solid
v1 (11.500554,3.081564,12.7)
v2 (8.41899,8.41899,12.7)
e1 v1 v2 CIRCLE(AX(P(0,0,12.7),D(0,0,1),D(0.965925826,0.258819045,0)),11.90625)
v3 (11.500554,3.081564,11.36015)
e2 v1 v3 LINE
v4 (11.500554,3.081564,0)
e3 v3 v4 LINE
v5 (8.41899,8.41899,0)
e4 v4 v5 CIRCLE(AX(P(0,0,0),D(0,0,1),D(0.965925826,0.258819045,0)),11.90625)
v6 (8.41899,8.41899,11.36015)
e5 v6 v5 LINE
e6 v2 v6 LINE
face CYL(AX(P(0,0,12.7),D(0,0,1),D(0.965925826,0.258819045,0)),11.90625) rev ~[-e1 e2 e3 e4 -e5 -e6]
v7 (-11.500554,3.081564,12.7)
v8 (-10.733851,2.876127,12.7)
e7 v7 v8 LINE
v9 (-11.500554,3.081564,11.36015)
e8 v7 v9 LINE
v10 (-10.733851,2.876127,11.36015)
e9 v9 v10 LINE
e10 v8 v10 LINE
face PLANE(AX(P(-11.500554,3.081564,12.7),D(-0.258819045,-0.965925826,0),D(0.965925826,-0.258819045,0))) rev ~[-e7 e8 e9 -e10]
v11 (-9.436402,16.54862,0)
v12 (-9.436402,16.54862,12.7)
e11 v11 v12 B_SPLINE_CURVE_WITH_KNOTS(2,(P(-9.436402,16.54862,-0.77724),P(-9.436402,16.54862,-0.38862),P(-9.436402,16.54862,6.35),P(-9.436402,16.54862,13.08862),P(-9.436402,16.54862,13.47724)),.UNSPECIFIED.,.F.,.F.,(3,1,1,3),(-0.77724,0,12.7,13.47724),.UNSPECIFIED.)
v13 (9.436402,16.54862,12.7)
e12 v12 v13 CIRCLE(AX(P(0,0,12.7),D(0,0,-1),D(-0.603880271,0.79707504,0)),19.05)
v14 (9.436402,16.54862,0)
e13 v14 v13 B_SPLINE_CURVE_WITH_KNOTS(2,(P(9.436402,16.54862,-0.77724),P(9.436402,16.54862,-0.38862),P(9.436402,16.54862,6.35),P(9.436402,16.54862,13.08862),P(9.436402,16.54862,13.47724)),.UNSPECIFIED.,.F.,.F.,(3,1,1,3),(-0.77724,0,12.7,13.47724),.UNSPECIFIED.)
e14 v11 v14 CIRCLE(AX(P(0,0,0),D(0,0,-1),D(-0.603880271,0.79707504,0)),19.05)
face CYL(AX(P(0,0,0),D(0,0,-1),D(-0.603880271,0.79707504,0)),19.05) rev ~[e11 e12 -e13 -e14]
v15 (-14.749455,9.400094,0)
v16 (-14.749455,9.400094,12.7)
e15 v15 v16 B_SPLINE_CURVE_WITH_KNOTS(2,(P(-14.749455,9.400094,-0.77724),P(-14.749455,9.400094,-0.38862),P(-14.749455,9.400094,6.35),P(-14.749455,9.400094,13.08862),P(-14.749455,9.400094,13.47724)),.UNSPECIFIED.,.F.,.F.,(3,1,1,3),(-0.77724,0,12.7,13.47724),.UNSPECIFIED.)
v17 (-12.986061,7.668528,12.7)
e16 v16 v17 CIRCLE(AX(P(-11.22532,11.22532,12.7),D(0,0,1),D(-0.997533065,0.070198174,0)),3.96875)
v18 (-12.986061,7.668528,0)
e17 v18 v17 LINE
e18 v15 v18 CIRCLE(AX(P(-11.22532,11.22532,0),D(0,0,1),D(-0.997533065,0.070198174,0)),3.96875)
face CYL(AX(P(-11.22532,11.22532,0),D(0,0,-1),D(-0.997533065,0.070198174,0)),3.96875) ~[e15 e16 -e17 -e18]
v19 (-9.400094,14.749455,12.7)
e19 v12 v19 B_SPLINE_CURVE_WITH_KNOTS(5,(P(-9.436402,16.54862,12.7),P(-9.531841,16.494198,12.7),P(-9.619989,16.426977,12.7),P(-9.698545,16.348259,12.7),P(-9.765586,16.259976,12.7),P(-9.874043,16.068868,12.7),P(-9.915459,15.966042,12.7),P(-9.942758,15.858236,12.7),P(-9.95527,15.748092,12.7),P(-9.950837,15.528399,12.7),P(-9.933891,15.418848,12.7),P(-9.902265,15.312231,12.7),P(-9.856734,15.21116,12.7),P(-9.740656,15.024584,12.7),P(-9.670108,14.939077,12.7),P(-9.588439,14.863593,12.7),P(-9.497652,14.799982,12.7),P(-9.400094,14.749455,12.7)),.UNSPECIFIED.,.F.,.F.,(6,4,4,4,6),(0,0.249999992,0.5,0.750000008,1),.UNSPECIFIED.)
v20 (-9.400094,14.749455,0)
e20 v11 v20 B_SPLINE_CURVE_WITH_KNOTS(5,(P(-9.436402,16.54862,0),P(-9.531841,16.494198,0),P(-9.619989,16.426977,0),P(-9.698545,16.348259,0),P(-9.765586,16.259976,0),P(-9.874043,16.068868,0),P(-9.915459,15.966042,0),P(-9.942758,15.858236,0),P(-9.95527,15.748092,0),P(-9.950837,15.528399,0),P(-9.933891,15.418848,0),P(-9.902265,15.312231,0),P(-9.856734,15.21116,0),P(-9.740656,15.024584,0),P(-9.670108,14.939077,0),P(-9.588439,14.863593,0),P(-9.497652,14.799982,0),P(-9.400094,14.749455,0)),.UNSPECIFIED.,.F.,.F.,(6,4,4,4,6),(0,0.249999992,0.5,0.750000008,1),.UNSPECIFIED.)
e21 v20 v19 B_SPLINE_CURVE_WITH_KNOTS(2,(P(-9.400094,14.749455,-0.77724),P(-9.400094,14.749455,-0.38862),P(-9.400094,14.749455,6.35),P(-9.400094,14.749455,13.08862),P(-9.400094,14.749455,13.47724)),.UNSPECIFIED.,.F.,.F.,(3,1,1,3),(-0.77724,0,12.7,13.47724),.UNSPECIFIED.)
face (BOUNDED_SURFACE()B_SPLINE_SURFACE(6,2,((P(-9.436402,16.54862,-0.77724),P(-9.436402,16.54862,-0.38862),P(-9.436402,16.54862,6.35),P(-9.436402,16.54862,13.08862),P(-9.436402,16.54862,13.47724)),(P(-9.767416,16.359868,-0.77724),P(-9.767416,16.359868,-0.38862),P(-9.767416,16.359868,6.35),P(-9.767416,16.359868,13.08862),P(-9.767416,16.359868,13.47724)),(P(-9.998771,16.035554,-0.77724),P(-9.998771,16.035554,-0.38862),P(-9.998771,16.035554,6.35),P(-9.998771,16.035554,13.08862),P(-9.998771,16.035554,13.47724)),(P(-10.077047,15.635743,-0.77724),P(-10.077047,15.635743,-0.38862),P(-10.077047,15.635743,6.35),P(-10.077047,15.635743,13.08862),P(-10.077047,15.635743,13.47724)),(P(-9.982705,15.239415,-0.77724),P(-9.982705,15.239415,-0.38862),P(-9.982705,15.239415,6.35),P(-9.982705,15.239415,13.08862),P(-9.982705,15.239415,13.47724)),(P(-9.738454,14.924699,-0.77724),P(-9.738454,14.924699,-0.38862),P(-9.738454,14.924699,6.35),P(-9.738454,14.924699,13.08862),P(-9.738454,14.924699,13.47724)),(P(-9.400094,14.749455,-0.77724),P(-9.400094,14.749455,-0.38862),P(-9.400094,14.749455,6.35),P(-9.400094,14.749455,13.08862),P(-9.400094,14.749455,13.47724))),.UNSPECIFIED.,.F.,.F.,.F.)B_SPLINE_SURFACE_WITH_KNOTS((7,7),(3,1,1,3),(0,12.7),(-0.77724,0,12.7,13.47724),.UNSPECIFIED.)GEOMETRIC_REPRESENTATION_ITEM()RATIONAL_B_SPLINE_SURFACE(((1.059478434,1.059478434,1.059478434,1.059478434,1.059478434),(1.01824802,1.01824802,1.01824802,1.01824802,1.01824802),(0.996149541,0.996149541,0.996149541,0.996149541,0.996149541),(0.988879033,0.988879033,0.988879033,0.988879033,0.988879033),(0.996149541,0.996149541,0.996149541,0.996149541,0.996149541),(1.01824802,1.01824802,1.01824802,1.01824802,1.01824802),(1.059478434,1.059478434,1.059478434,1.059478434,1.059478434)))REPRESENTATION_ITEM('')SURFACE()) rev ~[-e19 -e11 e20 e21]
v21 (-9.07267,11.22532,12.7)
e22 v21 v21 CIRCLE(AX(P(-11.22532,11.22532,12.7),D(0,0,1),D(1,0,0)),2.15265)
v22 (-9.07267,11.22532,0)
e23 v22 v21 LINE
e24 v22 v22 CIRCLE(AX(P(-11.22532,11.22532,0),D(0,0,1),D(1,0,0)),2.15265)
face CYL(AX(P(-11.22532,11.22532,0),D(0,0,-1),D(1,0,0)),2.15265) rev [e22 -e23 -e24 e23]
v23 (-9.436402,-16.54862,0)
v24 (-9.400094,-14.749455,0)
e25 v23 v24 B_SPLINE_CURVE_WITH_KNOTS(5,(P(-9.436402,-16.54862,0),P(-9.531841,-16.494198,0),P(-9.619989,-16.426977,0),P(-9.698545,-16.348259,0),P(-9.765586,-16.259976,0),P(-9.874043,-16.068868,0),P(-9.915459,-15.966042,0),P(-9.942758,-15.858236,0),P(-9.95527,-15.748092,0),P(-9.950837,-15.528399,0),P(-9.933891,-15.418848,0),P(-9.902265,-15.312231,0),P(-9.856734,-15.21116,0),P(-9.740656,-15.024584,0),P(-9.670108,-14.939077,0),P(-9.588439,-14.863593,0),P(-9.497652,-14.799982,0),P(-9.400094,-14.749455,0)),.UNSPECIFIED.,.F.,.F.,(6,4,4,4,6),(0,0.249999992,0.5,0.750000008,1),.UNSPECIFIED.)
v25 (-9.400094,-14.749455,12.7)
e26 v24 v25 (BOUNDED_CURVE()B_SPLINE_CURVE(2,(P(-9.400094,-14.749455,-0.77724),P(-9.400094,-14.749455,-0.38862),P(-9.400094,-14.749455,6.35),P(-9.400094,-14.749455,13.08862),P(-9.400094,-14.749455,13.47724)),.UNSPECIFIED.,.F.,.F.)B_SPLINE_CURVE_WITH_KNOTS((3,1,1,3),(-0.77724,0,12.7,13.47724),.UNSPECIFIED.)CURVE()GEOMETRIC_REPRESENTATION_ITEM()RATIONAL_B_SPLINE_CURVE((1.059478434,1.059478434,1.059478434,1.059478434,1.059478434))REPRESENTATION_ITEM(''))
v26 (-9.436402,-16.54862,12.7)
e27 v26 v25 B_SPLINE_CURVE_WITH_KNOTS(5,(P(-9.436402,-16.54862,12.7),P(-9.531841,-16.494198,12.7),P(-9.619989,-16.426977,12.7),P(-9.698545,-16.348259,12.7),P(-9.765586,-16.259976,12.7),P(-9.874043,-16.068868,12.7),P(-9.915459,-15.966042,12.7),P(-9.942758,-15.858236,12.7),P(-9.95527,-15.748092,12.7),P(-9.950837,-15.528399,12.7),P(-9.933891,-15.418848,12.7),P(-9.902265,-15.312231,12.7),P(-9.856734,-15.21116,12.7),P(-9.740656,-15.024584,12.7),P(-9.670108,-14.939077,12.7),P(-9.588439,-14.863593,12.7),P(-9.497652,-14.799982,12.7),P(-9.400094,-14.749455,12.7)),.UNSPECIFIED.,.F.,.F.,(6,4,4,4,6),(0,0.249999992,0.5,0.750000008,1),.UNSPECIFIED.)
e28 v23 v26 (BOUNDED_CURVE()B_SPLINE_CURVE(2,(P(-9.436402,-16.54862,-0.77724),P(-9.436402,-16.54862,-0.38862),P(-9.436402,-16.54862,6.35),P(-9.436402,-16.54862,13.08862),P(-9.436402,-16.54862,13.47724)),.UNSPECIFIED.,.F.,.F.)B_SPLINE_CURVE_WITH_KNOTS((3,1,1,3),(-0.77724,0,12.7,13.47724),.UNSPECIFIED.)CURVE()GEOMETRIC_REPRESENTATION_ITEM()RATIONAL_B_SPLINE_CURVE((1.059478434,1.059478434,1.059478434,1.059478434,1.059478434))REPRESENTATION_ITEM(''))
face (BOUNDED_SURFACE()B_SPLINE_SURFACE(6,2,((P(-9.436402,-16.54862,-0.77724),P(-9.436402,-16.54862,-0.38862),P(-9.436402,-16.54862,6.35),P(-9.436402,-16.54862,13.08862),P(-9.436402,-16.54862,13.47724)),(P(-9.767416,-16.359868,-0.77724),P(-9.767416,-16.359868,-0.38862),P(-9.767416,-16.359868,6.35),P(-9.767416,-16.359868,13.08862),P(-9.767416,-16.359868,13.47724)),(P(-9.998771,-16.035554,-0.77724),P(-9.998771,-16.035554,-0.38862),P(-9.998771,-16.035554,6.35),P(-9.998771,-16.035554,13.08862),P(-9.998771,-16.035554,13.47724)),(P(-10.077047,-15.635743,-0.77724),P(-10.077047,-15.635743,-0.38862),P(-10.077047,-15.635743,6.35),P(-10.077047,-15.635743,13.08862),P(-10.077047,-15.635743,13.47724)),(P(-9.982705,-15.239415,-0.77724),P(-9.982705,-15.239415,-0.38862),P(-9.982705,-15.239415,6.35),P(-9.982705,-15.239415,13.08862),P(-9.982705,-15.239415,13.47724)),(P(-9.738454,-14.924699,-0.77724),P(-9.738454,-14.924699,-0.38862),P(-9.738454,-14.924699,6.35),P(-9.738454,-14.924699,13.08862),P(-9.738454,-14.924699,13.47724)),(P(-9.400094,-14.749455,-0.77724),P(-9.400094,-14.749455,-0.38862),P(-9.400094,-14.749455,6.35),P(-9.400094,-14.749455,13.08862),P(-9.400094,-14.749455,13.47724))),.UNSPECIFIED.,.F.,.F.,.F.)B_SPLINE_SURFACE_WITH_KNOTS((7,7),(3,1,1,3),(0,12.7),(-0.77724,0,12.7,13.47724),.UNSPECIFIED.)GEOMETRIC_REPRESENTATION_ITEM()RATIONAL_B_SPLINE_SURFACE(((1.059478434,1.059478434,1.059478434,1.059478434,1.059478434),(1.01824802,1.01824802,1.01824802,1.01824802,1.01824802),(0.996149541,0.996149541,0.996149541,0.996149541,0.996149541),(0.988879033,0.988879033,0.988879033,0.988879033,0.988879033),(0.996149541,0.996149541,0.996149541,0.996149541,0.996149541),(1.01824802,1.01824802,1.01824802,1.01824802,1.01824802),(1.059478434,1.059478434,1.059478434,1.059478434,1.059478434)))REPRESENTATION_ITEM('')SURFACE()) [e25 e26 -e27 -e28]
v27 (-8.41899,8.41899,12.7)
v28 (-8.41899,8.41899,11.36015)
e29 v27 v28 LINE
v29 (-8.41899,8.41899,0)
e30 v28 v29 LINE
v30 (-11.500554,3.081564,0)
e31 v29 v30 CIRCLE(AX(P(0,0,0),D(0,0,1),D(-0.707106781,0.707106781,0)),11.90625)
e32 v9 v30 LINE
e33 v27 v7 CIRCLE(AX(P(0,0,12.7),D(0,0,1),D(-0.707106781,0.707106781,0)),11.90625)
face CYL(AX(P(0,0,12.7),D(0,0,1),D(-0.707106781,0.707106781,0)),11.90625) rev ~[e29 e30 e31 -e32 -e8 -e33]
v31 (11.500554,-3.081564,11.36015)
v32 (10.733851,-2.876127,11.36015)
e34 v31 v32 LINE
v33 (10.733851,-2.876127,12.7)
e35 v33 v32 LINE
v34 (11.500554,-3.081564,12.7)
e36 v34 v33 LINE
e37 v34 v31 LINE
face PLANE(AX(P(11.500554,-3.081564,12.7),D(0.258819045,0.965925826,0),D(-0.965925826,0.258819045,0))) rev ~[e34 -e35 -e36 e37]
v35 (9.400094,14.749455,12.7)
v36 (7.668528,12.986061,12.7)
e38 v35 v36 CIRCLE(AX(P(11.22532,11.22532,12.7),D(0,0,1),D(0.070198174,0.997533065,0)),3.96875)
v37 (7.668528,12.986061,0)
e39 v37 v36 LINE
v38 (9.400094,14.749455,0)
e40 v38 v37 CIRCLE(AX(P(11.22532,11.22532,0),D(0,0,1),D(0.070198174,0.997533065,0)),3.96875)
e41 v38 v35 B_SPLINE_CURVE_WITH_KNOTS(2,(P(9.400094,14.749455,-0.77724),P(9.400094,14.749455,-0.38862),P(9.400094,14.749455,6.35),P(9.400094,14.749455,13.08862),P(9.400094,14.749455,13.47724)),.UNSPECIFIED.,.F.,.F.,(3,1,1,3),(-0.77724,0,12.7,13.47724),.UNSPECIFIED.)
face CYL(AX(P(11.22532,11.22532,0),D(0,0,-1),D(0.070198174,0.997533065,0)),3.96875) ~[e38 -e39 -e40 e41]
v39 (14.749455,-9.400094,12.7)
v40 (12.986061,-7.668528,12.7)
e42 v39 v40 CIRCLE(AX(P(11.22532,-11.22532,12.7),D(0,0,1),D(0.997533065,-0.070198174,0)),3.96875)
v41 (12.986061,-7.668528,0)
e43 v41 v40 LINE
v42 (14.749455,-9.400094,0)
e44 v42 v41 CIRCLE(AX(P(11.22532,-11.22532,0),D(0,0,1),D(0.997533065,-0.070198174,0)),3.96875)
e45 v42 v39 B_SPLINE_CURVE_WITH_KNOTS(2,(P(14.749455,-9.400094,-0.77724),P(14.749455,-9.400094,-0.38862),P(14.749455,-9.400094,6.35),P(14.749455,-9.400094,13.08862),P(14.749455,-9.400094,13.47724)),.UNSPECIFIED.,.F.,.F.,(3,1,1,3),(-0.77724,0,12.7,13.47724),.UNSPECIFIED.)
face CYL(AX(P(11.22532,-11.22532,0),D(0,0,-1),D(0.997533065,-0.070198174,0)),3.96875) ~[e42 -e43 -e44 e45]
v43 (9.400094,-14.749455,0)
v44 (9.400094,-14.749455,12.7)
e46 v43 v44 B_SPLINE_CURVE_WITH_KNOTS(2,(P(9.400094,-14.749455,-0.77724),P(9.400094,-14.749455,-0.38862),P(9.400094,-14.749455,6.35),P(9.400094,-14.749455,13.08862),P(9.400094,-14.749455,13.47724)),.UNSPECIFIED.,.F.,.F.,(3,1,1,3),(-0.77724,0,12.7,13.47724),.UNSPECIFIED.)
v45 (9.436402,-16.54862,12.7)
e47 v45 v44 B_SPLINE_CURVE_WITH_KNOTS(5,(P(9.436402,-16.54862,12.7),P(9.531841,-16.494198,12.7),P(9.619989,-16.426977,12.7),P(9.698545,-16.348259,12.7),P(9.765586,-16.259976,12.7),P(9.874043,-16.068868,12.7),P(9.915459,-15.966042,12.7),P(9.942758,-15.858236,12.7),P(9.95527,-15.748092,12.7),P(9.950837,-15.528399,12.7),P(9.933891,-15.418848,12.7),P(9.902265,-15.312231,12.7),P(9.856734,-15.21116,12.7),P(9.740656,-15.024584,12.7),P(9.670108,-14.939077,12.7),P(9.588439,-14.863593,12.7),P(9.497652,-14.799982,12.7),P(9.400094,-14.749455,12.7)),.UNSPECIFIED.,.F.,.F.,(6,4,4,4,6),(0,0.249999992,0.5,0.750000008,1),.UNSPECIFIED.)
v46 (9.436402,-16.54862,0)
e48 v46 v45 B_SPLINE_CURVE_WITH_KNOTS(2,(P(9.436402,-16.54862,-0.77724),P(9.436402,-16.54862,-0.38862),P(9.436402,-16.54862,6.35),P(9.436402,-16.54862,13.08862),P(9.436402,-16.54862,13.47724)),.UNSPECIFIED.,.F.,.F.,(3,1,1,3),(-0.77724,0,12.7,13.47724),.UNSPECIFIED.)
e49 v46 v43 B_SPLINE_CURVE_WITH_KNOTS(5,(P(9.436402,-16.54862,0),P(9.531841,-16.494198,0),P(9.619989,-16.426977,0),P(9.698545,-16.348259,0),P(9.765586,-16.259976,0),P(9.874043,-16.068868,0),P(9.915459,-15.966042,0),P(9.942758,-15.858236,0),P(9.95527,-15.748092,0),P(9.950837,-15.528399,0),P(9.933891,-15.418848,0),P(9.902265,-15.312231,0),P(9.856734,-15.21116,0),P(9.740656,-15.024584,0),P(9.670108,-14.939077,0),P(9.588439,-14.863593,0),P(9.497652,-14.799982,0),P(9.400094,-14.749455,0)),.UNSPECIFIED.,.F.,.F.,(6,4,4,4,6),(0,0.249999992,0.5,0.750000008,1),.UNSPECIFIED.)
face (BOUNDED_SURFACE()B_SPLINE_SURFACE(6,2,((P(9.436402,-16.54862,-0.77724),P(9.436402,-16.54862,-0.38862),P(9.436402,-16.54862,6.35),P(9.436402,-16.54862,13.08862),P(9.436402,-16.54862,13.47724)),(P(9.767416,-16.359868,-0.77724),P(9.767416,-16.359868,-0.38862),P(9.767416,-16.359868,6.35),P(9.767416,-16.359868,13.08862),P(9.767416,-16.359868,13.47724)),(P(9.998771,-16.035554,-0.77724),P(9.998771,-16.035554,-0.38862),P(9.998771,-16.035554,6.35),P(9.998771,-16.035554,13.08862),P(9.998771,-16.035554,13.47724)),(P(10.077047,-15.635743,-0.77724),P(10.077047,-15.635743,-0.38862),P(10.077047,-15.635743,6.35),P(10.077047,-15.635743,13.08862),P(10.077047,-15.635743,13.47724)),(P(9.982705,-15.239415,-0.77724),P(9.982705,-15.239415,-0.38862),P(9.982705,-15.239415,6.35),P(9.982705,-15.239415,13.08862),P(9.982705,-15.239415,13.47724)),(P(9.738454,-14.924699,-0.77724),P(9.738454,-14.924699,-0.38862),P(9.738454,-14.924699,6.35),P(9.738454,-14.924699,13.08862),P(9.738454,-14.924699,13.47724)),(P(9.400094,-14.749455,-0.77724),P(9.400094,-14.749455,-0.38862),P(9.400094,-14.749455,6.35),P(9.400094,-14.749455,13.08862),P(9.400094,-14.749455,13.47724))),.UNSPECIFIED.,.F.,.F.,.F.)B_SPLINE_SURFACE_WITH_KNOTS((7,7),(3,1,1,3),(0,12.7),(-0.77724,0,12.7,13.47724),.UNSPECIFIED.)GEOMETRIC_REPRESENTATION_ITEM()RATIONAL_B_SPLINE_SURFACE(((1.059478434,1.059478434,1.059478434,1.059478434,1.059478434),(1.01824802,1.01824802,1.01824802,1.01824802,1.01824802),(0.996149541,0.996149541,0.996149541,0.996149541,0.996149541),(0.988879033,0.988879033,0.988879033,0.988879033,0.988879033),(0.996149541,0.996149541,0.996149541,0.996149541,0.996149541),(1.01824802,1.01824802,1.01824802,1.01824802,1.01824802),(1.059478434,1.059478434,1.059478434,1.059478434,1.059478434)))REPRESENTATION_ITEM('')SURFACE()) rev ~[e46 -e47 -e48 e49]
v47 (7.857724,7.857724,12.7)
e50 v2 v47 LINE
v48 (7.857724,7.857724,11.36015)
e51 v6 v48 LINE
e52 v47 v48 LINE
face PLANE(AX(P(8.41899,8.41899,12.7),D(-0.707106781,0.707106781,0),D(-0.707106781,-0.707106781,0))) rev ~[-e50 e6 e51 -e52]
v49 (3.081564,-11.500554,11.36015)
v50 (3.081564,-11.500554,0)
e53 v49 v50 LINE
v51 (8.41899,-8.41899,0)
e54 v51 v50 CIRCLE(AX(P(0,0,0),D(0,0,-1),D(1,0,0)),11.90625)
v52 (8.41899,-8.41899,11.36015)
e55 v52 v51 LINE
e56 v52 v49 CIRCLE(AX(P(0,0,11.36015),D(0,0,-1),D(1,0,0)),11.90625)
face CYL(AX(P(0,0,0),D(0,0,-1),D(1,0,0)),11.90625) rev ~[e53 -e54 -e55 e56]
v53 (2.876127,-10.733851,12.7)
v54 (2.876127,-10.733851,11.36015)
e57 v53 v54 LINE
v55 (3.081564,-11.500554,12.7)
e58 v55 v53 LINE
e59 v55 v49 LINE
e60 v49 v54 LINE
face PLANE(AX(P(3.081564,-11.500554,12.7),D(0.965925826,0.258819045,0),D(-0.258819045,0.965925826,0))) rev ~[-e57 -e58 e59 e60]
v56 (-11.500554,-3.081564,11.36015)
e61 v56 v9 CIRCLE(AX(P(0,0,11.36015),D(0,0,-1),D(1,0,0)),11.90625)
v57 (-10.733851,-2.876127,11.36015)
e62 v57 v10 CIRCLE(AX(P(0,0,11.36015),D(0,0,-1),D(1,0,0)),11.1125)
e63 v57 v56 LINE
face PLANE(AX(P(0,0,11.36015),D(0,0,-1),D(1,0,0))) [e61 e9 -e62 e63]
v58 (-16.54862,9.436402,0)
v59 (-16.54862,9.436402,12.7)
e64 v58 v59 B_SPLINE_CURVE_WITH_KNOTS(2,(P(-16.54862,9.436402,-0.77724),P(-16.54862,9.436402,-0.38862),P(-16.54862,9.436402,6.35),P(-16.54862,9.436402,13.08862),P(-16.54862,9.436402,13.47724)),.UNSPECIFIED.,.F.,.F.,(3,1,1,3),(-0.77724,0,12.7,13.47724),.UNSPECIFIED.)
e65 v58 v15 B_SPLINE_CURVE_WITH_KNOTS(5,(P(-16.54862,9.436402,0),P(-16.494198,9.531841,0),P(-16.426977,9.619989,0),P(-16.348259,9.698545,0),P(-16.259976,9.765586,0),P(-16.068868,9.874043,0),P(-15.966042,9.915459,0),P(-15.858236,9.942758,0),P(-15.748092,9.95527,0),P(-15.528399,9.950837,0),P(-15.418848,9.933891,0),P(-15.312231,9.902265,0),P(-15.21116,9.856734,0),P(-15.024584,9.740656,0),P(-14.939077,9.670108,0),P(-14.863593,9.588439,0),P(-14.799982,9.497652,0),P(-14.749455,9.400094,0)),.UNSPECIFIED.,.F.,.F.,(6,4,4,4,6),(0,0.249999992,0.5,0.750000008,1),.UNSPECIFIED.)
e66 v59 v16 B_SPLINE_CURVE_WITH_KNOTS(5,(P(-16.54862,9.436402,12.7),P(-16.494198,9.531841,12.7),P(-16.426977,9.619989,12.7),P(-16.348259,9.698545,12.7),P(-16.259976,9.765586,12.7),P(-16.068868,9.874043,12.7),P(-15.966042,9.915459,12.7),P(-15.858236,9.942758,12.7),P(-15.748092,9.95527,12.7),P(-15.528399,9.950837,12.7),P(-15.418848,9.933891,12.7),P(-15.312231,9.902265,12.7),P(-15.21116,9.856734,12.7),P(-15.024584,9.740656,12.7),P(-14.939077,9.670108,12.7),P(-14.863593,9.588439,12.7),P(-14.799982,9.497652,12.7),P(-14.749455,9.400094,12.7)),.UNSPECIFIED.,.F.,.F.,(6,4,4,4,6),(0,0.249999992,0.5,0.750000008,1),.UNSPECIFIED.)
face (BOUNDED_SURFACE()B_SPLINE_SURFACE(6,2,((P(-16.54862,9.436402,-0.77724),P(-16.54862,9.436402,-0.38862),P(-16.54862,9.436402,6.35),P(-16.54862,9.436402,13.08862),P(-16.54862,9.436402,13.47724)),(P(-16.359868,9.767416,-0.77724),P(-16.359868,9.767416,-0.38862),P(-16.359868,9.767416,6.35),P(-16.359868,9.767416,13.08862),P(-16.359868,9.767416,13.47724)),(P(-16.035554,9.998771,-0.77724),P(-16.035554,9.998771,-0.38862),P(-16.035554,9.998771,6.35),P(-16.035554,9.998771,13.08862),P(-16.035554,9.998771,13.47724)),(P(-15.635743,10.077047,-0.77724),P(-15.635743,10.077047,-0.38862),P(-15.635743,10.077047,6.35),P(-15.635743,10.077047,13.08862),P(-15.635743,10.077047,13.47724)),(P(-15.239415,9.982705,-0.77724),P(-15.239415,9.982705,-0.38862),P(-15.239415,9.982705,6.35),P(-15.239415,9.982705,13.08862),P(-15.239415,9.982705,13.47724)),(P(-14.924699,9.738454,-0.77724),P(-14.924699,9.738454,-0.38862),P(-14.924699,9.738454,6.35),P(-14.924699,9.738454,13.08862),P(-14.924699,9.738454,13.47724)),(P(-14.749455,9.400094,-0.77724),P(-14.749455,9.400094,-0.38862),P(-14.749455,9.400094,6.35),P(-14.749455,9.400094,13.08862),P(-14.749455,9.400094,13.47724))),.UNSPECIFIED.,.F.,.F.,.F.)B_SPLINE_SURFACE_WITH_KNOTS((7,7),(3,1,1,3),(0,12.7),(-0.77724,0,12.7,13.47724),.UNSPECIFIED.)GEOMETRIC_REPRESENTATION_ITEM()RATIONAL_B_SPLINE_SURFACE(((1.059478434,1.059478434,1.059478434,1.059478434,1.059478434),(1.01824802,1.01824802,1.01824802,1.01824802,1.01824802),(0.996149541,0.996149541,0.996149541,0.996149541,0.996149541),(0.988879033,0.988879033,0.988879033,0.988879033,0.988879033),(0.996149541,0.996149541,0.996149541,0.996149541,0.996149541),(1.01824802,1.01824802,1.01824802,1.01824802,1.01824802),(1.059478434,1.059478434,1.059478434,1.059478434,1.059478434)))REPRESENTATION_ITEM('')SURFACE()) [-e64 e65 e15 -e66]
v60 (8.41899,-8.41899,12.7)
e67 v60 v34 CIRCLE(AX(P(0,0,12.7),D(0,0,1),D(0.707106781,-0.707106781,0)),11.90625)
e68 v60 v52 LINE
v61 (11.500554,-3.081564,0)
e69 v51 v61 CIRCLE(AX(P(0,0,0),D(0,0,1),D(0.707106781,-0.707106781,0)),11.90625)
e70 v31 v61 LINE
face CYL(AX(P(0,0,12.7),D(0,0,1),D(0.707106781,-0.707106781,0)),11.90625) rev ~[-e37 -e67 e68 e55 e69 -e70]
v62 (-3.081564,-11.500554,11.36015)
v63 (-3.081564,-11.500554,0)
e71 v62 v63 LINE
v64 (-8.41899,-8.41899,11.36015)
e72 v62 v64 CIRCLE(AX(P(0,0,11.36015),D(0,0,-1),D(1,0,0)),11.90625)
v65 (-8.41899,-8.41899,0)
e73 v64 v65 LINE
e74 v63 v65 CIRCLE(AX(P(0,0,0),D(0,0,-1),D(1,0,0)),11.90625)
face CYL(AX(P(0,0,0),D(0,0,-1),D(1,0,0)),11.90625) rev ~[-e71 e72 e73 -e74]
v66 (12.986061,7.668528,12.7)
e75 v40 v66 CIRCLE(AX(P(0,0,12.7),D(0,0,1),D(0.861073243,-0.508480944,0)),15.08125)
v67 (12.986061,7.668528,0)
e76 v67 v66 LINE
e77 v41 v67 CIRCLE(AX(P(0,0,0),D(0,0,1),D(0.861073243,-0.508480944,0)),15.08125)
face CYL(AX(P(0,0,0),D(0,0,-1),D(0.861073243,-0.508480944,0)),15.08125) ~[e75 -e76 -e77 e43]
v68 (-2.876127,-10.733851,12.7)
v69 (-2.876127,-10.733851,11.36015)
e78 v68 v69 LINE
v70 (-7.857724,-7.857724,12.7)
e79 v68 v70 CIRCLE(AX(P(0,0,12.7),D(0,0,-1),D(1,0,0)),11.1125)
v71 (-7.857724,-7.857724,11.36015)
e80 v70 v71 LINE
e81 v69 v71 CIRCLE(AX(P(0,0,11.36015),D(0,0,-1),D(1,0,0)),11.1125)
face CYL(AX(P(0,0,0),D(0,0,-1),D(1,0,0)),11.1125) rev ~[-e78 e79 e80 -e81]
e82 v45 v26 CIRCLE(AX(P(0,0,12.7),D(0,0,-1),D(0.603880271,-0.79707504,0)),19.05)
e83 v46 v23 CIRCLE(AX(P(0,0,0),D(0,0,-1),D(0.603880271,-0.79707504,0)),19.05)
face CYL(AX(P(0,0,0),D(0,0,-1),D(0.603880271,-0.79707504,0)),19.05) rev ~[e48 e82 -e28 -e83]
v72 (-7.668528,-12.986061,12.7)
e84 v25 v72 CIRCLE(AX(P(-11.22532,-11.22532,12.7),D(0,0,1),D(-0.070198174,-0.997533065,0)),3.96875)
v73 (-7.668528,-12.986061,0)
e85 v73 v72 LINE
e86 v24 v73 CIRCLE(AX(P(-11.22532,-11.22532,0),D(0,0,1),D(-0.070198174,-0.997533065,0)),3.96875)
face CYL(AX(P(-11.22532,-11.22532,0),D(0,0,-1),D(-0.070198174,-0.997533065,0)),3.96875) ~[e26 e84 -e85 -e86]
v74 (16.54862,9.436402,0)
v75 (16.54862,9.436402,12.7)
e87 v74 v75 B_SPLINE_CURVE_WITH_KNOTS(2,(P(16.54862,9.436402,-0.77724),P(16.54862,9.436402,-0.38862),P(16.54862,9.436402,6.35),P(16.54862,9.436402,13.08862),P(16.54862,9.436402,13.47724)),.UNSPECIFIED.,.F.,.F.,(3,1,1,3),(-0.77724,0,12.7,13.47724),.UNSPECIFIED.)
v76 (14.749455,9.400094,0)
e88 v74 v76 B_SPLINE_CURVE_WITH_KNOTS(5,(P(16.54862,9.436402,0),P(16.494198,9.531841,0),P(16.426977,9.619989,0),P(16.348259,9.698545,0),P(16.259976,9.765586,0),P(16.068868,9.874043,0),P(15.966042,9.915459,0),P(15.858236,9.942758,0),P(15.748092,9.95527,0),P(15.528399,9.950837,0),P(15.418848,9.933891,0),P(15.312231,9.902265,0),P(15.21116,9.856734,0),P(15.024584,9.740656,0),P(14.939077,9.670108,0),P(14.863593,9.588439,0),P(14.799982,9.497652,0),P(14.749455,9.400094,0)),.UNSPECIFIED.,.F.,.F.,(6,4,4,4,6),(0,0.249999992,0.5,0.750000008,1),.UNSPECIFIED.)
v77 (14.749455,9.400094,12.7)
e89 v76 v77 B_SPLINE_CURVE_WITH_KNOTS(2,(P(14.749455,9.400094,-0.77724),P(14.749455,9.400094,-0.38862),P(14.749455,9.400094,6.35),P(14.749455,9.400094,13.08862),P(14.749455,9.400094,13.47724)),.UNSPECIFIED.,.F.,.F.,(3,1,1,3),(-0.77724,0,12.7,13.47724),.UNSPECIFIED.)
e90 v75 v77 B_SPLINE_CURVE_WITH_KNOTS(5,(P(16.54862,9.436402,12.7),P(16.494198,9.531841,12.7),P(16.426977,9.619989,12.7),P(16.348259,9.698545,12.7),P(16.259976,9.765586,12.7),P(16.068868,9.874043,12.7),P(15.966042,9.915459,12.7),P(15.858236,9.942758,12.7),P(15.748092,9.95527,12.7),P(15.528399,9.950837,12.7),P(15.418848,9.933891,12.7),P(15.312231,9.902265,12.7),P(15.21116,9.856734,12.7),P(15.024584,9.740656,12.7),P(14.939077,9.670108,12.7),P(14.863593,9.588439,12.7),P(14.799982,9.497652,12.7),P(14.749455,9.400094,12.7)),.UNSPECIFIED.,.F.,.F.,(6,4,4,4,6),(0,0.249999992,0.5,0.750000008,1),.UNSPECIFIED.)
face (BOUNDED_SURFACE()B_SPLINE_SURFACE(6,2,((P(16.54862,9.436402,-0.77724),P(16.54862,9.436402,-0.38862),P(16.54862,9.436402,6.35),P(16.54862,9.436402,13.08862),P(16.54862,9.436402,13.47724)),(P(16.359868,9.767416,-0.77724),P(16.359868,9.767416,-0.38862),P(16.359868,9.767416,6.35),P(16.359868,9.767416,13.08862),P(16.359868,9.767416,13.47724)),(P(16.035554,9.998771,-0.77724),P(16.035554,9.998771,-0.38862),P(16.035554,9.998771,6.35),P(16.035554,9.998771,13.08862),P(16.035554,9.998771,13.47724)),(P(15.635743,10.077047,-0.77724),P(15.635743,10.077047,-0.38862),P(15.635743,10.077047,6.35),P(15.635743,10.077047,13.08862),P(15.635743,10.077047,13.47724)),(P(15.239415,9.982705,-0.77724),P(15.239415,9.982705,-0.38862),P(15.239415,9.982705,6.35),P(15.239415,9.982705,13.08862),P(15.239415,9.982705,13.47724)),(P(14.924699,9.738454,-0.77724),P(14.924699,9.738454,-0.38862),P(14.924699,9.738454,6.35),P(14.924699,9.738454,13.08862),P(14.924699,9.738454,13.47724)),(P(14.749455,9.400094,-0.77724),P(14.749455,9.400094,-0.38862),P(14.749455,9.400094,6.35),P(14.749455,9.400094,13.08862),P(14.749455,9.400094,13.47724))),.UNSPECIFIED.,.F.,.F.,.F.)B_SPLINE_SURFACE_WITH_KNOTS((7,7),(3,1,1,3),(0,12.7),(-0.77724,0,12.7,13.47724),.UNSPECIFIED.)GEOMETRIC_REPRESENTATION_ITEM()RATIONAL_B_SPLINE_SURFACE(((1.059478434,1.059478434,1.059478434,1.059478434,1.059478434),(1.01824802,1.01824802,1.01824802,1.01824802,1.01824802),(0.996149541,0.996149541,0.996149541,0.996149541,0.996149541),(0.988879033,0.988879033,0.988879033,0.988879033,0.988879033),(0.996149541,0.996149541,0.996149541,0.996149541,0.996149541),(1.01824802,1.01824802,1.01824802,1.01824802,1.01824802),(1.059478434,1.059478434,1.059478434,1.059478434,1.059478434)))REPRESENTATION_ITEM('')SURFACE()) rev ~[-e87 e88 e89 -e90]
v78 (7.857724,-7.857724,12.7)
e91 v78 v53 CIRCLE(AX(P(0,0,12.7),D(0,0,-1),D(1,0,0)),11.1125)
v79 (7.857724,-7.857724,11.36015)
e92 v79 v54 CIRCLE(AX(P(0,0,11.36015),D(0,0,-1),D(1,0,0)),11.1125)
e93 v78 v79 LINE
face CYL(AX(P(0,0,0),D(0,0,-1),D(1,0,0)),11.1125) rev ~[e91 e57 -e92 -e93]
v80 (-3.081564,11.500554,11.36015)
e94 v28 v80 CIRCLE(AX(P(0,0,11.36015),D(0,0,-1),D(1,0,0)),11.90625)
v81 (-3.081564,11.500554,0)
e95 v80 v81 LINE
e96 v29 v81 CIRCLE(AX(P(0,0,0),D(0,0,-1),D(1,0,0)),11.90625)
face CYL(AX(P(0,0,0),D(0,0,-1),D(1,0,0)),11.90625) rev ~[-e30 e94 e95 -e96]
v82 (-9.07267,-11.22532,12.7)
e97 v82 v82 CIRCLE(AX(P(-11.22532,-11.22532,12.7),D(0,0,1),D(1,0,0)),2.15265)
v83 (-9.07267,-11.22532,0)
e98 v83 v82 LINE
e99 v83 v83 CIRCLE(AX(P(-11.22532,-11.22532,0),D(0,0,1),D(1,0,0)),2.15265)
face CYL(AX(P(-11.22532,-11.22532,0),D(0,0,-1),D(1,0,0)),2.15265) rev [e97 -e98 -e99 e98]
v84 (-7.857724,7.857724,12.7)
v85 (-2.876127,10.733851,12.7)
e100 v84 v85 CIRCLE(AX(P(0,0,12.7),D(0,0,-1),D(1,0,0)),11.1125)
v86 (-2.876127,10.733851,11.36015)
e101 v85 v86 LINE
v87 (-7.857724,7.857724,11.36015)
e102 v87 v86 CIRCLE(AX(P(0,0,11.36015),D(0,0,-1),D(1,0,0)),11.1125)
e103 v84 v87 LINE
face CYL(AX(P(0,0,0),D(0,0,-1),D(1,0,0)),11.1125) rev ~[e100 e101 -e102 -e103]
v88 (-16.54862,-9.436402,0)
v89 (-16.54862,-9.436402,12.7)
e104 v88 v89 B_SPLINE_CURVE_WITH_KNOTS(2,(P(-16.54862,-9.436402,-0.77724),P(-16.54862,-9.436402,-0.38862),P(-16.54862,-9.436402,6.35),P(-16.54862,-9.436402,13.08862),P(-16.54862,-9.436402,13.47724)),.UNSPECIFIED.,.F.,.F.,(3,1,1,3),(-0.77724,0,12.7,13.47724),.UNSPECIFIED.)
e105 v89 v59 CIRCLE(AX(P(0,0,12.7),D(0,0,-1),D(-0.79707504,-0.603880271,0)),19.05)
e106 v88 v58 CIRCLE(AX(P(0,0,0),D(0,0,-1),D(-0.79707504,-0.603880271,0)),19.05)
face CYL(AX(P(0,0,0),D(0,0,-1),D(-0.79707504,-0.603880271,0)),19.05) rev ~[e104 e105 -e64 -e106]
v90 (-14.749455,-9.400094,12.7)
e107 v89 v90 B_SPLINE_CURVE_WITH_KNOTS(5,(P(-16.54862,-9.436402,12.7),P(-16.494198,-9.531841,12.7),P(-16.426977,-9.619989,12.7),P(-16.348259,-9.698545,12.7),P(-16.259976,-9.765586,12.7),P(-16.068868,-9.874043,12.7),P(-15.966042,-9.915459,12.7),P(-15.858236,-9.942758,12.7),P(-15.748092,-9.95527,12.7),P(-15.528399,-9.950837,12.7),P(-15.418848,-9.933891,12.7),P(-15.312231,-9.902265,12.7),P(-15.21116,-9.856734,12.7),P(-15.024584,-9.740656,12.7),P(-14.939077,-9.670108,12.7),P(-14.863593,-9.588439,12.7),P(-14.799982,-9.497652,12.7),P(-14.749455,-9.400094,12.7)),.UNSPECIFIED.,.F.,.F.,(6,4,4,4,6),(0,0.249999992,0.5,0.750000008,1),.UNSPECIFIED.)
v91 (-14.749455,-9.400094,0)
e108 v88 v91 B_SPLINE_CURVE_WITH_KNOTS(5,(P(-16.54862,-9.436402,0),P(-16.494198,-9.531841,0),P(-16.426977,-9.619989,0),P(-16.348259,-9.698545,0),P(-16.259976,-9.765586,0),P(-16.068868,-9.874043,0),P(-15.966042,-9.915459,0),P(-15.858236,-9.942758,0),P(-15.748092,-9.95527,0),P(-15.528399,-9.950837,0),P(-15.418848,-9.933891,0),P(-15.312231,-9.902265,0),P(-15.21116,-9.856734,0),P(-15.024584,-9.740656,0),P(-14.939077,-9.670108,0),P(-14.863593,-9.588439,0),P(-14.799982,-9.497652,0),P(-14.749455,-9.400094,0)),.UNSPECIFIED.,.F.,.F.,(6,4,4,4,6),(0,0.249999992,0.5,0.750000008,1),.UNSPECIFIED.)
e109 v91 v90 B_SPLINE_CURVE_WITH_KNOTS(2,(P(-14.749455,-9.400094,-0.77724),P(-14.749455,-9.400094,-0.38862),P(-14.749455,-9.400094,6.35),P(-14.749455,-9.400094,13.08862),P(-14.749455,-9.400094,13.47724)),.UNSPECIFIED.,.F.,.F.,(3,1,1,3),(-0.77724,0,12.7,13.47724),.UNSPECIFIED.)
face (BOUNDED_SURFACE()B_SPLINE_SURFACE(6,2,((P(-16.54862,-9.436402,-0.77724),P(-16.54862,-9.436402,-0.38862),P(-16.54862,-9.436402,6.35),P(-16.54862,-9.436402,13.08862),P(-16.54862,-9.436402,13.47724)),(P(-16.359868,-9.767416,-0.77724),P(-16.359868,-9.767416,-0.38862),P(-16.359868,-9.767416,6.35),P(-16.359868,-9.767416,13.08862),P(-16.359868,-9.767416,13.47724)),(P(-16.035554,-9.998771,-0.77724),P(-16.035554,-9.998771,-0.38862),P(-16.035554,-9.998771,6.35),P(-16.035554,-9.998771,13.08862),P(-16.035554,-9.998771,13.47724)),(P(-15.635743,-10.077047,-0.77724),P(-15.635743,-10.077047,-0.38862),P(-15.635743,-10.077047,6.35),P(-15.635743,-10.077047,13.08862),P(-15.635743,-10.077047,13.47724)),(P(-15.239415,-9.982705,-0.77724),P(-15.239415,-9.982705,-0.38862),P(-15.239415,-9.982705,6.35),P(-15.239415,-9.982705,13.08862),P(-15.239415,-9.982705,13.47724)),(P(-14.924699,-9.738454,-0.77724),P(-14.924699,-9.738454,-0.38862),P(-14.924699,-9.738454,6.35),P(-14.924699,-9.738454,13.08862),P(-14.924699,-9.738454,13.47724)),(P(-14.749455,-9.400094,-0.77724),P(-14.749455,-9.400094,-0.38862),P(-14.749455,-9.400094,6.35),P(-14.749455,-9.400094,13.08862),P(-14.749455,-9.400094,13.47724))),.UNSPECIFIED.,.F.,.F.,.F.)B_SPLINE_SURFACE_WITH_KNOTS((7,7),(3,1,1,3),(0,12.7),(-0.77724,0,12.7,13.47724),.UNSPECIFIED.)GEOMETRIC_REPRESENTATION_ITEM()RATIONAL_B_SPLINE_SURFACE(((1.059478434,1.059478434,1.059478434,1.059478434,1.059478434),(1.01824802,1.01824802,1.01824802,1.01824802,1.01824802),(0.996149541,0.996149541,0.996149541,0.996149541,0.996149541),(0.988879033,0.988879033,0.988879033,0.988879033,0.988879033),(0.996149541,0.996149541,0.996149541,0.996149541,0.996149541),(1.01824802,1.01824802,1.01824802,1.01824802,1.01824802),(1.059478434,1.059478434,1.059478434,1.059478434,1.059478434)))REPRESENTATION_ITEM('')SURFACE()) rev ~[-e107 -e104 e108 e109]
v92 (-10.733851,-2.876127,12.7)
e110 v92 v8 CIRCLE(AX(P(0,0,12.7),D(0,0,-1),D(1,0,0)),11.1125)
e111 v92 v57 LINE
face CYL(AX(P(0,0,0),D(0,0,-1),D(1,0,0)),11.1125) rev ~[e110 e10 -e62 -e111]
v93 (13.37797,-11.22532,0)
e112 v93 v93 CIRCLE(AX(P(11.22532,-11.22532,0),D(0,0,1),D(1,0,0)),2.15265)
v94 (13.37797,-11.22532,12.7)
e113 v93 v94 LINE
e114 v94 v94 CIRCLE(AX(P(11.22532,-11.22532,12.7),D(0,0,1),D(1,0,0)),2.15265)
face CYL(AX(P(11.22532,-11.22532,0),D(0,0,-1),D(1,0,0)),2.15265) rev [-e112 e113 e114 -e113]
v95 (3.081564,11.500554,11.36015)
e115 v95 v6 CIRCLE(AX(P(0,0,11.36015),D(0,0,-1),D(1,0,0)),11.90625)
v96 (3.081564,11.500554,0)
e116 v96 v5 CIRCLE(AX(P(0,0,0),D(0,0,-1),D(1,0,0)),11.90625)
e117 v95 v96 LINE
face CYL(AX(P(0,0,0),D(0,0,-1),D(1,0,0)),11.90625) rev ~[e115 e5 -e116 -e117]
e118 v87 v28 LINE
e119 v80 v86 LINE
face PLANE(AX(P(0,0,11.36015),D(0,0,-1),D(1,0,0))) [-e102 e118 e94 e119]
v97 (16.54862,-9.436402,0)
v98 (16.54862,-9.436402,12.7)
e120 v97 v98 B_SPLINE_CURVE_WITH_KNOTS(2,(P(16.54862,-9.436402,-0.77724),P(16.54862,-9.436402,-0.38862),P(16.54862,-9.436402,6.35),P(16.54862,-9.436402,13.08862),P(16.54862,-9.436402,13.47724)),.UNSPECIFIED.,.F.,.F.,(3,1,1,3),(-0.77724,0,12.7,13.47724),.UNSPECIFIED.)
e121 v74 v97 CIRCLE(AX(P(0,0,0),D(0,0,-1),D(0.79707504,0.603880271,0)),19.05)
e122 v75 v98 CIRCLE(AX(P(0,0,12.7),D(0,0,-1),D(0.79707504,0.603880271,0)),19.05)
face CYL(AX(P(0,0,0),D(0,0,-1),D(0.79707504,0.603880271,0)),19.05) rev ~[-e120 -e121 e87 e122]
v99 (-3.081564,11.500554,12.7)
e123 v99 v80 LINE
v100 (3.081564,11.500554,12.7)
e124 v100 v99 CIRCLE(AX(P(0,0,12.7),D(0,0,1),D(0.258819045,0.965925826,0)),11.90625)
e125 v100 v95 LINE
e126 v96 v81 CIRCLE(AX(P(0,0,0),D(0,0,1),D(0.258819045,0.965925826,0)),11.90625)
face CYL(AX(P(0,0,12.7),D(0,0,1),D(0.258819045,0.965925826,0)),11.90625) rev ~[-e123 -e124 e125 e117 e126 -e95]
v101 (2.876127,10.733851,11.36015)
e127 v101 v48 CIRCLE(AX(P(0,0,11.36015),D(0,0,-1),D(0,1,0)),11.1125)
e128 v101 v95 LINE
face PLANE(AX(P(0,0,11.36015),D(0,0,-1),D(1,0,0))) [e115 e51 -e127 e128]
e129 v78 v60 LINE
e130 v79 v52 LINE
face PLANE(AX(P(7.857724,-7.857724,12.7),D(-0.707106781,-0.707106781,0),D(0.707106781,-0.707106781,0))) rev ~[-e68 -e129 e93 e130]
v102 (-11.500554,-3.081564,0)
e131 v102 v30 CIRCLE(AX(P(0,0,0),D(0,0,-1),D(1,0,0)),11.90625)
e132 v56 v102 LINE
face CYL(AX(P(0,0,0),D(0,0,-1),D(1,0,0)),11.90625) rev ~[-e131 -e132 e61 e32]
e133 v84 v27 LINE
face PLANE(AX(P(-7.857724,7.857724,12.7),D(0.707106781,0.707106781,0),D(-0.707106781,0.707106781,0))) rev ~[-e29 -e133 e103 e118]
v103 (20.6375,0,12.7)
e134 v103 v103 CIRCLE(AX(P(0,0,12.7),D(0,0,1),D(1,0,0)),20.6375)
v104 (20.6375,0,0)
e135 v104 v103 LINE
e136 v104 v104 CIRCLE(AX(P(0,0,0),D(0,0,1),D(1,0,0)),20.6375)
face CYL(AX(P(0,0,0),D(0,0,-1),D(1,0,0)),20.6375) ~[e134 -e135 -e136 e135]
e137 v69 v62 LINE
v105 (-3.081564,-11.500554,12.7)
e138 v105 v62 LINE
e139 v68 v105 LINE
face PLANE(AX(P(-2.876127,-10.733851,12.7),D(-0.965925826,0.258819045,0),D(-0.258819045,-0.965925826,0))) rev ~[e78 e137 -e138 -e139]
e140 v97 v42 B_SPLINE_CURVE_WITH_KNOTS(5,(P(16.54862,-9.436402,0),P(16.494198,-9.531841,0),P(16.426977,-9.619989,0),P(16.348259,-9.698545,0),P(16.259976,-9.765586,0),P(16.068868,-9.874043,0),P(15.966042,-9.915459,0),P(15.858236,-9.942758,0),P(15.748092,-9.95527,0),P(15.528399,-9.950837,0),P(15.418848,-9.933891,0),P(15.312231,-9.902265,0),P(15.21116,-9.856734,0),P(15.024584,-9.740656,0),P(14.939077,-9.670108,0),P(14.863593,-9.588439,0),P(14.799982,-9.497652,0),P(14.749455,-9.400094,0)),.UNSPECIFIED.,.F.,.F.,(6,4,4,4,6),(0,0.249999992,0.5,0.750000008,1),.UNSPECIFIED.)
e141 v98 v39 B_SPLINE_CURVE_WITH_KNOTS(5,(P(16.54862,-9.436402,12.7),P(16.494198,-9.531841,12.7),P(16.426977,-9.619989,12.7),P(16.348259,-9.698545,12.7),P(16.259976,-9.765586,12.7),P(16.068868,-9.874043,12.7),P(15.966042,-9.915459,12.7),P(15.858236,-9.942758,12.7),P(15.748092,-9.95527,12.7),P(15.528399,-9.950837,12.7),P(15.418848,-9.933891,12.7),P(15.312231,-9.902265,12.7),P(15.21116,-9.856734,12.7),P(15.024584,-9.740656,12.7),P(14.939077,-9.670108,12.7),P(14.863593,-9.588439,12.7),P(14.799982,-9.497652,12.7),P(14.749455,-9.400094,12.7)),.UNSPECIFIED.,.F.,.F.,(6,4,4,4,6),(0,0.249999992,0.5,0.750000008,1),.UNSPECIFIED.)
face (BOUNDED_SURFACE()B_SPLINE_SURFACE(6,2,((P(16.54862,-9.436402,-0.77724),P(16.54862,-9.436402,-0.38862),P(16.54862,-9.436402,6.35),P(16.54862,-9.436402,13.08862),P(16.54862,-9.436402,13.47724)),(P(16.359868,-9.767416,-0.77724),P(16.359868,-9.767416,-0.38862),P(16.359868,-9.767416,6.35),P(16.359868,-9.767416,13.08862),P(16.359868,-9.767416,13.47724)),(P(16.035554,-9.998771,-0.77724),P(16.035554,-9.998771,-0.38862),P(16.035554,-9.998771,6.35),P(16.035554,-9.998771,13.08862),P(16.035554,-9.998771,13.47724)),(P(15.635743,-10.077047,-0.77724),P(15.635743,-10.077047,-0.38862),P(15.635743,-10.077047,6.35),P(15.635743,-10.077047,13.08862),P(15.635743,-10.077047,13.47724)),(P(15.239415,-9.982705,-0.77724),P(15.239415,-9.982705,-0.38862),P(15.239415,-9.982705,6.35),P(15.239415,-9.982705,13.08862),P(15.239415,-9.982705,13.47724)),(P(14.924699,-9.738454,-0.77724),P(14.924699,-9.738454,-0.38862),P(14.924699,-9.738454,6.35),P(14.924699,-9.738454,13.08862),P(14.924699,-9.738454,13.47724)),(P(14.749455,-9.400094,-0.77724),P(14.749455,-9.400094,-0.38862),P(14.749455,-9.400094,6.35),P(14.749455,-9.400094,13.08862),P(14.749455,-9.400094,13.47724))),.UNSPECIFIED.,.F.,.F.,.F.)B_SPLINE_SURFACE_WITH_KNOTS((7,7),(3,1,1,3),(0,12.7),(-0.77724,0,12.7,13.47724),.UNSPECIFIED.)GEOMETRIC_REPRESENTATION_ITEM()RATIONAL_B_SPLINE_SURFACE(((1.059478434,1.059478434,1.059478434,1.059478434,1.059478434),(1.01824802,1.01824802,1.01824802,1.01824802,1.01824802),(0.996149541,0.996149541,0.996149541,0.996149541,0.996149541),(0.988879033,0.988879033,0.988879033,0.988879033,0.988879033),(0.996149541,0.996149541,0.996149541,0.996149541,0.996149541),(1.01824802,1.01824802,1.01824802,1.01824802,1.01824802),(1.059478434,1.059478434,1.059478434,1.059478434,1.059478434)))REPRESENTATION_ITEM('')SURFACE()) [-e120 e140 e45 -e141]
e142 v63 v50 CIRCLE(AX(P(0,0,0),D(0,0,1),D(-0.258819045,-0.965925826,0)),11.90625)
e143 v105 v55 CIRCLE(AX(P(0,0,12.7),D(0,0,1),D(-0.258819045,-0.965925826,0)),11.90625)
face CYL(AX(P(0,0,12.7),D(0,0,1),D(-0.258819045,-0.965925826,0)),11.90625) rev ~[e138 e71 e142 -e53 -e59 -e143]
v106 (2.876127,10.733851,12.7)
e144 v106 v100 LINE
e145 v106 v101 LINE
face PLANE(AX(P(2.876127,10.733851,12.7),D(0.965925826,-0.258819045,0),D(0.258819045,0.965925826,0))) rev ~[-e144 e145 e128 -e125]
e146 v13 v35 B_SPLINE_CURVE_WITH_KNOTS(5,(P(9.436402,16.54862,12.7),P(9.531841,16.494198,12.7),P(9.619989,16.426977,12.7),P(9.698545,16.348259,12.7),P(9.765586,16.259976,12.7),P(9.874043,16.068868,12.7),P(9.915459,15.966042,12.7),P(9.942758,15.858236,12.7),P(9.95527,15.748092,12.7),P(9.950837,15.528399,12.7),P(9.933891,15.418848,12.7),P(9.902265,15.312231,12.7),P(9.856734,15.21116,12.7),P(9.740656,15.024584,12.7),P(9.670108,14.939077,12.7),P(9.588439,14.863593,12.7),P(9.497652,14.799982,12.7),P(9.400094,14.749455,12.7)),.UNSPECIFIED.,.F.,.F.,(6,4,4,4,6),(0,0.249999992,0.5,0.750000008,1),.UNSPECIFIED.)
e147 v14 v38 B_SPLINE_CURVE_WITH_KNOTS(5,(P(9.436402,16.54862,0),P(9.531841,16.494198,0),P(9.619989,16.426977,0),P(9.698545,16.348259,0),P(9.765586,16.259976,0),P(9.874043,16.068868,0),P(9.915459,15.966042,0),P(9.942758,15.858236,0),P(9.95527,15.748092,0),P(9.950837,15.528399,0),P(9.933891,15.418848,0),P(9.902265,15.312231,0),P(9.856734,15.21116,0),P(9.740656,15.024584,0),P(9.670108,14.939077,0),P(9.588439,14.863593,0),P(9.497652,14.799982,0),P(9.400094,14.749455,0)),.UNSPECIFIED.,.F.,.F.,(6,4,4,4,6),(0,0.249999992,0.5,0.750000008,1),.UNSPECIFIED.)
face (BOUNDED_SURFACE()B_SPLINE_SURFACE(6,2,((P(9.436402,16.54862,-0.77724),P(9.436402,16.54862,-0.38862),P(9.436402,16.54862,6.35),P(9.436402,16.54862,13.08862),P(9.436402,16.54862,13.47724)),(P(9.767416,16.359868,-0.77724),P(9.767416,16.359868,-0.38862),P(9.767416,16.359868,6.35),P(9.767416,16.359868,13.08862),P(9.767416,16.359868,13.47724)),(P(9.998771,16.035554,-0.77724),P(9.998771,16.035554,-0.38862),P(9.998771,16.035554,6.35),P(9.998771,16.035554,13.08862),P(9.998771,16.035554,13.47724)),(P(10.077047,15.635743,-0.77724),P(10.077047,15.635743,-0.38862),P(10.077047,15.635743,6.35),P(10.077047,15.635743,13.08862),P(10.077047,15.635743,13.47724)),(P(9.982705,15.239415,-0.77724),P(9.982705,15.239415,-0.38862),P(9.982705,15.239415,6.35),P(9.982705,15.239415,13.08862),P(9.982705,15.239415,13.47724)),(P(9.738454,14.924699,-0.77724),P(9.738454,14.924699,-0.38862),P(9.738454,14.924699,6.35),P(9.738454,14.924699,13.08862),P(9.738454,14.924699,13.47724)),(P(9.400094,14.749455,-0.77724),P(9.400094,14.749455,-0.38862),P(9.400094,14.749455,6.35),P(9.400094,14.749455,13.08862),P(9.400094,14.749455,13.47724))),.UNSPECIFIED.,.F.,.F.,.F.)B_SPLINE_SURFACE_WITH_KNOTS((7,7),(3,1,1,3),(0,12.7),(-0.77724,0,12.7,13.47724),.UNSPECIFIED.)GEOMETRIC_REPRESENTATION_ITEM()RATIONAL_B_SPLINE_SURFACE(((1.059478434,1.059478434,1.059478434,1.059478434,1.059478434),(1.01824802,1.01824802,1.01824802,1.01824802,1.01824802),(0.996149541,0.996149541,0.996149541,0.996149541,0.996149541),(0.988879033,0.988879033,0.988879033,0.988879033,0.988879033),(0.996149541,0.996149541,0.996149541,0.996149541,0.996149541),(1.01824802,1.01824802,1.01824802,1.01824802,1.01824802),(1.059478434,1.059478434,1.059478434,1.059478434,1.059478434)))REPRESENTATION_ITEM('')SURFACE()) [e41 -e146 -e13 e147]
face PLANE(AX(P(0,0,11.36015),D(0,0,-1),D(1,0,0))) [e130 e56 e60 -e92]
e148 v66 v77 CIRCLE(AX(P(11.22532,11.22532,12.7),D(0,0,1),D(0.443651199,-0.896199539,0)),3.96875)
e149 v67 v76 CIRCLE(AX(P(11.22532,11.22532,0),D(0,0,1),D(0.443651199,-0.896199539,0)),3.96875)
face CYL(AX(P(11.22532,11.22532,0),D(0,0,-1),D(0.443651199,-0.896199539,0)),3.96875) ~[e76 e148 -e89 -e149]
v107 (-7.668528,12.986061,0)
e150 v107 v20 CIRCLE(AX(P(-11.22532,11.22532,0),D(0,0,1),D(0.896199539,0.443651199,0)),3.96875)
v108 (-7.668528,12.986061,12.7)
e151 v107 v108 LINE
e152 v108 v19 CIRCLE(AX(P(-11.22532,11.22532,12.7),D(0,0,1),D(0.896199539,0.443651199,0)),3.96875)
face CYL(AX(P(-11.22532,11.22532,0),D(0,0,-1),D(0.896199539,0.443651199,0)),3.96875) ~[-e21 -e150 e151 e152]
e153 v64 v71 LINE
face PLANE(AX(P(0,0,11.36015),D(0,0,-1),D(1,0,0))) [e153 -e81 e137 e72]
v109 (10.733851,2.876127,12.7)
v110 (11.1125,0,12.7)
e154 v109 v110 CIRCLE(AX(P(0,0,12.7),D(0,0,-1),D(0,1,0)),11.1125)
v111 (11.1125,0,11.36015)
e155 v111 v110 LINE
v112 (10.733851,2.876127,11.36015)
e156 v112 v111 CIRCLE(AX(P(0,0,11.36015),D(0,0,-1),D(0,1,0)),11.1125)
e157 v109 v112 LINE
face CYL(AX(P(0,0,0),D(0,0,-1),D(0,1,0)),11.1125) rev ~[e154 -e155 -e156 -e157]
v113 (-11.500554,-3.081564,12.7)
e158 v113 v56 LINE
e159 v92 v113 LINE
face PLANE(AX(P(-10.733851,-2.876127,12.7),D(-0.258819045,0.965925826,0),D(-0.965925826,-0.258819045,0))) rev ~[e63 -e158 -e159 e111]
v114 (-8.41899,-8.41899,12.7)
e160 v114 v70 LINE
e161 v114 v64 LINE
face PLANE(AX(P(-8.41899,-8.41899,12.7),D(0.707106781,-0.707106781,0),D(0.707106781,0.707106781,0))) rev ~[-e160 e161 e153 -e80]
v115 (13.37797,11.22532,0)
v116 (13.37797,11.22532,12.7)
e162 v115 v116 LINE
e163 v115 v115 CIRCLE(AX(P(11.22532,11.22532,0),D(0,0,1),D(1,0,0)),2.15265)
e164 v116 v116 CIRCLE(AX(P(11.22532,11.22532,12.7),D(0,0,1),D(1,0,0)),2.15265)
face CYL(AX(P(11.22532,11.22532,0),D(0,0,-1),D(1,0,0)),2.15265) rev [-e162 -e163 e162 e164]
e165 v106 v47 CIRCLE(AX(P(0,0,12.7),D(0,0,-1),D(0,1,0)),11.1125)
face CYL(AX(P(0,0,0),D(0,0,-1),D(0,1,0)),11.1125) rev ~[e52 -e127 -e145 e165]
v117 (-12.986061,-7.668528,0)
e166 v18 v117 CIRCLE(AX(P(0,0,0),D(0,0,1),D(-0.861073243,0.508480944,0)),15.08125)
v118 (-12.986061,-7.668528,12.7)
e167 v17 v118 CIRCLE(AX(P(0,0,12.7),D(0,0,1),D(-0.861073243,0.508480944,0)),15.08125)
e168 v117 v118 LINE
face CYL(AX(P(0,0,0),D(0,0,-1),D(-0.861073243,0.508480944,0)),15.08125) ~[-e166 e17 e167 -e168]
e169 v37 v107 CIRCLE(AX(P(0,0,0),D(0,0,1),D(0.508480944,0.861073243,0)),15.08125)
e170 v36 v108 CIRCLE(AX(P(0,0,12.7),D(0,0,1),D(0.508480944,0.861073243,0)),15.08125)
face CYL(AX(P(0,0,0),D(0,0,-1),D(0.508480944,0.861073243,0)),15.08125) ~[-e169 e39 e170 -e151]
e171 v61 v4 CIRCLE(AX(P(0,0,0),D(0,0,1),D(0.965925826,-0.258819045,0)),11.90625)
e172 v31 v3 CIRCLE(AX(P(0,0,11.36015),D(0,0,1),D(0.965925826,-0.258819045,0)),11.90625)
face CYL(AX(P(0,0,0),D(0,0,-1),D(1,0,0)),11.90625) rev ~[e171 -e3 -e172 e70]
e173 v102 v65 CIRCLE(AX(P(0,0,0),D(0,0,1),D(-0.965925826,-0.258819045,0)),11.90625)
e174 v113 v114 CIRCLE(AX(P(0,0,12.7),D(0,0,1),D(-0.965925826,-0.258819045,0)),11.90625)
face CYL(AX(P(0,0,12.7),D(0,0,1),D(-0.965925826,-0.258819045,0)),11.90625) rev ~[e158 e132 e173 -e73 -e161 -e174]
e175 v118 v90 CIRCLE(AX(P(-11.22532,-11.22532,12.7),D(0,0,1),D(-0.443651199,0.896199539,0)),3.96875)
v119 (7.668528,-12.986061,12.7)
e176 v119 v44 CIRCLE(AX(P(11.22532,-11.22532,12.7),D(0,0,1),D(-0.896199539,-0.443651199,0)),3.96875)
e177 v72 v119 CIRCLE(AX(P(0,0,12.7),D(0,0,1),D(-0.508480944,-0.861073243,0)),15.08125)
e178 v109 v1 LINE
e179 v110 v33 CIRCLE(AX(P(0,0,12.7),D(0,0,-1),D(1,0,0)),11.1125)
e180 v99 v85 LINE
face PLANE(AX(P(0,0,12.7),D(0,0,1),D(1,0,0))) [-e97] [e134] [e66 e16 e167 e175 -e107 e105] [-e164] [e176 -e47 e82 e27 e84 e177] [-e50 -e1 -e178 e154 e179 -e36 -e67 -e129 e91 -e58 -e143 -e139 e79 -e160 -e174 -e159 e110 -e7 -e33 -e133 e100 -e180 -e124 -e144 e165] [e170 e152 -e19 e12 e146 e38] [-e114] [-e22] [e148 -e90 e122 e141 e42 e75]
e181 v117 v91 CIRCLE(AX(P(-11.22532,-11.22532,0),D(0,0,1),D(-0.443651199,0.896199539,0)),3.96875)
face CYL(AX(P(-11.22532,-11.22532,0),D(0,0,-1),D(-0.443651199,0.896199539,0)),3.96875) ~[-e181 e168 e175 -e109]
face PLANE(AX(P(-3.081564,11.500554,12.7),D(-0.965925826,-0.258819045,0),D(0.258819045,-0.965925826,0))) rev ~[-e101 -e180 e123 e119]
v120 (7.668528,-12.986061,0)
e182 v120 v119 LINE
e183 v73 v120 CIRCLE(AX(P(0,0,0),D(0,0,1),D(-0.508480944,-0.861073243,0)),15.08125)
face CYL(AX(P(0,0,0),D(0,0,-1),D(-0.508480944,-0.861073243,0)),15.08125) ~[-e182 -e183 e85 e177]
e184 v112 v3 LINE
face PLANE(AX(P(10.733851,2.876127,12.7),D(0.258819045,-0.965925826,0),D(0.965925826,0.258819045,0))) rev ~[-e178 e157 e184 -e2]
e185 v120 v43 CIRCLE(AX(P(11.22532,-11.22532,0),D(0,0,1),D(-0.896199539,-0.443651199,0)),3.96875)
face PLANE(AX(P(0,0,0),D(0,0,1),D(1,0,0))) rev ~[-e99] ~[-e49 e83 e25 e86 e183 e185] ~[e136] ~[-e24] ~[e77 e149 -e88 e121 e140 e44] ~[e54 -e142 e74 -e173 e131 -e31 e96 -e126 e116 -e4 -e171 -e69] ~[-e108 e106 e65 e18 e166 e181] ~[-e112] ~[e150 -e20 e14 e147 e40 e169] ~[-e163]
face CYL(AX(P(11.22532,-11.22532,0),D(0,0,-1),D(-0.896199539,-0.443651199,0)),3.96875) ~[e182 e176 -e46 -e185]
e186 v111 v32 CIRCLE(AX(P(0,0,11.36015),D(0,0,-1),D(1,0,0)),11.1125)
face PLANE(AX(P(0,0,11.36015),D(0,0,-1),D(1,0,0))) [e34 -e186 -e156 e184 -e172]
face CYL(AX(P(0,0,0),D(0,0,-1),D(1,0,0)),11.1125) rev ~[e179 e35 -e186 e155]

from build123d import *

# Parameters (mm, degrees)
F0_R            = 20.6375
F0_R_2          = 2.15265
F1_DEPTH        = 12.7
F3_DEPTH        = 12.7
F4_COUNT        = 6
F4_ANGLE        = 300
F6_R            = 11.90625
F7_DEPTH        = 11.36015
F9_DEPTH        = 12.7
F9_COPIES_COUNT = 4
F10_R           = 1.0241935484


# Not quite as in the source:
# - a pattern or mirror of a feature is missing from the dataset's text; its kind, count and spacing are read off the source's solid


with BuildPart() as f1:
    # F0 (on Top) → F1 (new body)
    with BuildSketch(Plane.XY):
        Circle(F0_R)
        with Locations((-11.2253201513, -11.2253201513)):
            Circle(F0_R_2, mode=Mode.SUBTRACT)
        with Locations((11.2253201513, -11.2253201513)):
            Circle(F0_R_2, mode=Mode.SUBTRACT)
        with Locations((-11.2253201513, 11.2253201513)):
            Circle(F0_R_2, mode=Mode.SUBTRACT)
        with BuildLine():
            ThreePointArc((0, 11.1125), (7.8577241059, 7.8577241059), (11.1125, 0))
            ThreePointArc((11.1125, 0), (-7.8577241059, -7.8577241059), (0, 11.1125))
        make_face(mode=Mode.SUBTRACT)
        with Locations((11.2253201513, 11.2253201513)):
            Circle(F0_R_2, mode=Mode.SUBTRACT)
    extrude(amount=F1_DEPTH)

    # F2 (on face) → F3 (cut, through all)
    with BuildSketch(Plane.XY.offset(12.7)):
        with BuildLine():
            ThreePointArc((-2.8761266387, 10.7338507446), (0, 11.1125), (2.8761266387, 10.7338507446))
            Line((2.8761266387, 10.7338507446), (3.0815642558, 11.5005543693))
            ThreePointArc((3.0815642558, 11.5005543693), (0, 11.90625), (-3.0815642558, 11.5005543693))
            Line((-3.0815642558, 11.5005543693), (-2.8761266387, 10.7338507446))
        make_face()
    f3 = extrude(amount=-F3_DEPTH, mode=Mode.SUBTRACT)

    # F4: F3 ×6 about axis
    f4_axis = Axis((0, 0, 0), (0, 0, -1))
    for i in range(1, F4_COUNT):
        add(f3.rotate(f4_axis, i * F4_ANGLE / (F4_COUNT - 1)), mode=Mode.SUBTRACT)

    # F6 (on face) → F7 (cut, through all)
    with BuildSketch(Plane(origin=(0, 0, 0), x_dir=(1, 0, 0), z_dir=(0, 0, -1))):
        Circle(F6_R)
    extrude(amount=-F7_DEPTH, mode=Mode.SUBTRACT)

    # F8 (on face) → F9 (cut, through all)
    with BuildSketch(Plane(origin=(0, 0, 0), x_dir=(1, 0, 0), z_dir=(0, 0, -1))):
        with BuildLine():
            ThreePointArc((11.5039191556, -15.1842795042), (9.251826165, -14.6686177057), (7.6685282311, -12.9860608474))
            ThreePointArc((7.6685282311, -12.9860608474), (0, -15.08125), (-7.6685282311, -12.9860608474))
            ThreePointArc((-7.6685282311, -12.9860608474), (-9.251826165, -14.6686177057), (-11.5039191556, -15.1842795042))
            ThreePointArc((-11.5039191556, -15.1842795042), (0, -19.05), (11.5039191556, -15.1842795042))
        make_face()
    f9 = extrude(amount=-F9_DEPTH, mode=Mode.SUBTRACT)

    # F9_copies: F9 ×4 about axis
    f9_copies_axis = Axis((0, 0, 0), (0, 0, 1))
    for i in range(1, F9_COPIES_COUNT):
        add(f9.rotate(f9_copies_axis, i * 360 / F9_COPIES_COUNT), mode=Mode.SUBTRACT)

    # F10
    f10_edges = [f1.edges().sort_by_distance(p)[0] for p in [
        (-11.503919, 15.18428, 6.35),
        (11.503919, 15.18428, 6.35),
        (11.503919, -15.18428, 6.35),
        (-11.503919, -15.18428, 6.35),
        (-15.18428, -11.503919, 6.35),
        (-15.18428, 11.503919, 6.35),
        (15.18428, 11.503919, 6.35),
        (15.18428, -11.503919, 6.35),
    ]]
    fillet(f10_edges, radius=F10_R)


solid = f1.part
